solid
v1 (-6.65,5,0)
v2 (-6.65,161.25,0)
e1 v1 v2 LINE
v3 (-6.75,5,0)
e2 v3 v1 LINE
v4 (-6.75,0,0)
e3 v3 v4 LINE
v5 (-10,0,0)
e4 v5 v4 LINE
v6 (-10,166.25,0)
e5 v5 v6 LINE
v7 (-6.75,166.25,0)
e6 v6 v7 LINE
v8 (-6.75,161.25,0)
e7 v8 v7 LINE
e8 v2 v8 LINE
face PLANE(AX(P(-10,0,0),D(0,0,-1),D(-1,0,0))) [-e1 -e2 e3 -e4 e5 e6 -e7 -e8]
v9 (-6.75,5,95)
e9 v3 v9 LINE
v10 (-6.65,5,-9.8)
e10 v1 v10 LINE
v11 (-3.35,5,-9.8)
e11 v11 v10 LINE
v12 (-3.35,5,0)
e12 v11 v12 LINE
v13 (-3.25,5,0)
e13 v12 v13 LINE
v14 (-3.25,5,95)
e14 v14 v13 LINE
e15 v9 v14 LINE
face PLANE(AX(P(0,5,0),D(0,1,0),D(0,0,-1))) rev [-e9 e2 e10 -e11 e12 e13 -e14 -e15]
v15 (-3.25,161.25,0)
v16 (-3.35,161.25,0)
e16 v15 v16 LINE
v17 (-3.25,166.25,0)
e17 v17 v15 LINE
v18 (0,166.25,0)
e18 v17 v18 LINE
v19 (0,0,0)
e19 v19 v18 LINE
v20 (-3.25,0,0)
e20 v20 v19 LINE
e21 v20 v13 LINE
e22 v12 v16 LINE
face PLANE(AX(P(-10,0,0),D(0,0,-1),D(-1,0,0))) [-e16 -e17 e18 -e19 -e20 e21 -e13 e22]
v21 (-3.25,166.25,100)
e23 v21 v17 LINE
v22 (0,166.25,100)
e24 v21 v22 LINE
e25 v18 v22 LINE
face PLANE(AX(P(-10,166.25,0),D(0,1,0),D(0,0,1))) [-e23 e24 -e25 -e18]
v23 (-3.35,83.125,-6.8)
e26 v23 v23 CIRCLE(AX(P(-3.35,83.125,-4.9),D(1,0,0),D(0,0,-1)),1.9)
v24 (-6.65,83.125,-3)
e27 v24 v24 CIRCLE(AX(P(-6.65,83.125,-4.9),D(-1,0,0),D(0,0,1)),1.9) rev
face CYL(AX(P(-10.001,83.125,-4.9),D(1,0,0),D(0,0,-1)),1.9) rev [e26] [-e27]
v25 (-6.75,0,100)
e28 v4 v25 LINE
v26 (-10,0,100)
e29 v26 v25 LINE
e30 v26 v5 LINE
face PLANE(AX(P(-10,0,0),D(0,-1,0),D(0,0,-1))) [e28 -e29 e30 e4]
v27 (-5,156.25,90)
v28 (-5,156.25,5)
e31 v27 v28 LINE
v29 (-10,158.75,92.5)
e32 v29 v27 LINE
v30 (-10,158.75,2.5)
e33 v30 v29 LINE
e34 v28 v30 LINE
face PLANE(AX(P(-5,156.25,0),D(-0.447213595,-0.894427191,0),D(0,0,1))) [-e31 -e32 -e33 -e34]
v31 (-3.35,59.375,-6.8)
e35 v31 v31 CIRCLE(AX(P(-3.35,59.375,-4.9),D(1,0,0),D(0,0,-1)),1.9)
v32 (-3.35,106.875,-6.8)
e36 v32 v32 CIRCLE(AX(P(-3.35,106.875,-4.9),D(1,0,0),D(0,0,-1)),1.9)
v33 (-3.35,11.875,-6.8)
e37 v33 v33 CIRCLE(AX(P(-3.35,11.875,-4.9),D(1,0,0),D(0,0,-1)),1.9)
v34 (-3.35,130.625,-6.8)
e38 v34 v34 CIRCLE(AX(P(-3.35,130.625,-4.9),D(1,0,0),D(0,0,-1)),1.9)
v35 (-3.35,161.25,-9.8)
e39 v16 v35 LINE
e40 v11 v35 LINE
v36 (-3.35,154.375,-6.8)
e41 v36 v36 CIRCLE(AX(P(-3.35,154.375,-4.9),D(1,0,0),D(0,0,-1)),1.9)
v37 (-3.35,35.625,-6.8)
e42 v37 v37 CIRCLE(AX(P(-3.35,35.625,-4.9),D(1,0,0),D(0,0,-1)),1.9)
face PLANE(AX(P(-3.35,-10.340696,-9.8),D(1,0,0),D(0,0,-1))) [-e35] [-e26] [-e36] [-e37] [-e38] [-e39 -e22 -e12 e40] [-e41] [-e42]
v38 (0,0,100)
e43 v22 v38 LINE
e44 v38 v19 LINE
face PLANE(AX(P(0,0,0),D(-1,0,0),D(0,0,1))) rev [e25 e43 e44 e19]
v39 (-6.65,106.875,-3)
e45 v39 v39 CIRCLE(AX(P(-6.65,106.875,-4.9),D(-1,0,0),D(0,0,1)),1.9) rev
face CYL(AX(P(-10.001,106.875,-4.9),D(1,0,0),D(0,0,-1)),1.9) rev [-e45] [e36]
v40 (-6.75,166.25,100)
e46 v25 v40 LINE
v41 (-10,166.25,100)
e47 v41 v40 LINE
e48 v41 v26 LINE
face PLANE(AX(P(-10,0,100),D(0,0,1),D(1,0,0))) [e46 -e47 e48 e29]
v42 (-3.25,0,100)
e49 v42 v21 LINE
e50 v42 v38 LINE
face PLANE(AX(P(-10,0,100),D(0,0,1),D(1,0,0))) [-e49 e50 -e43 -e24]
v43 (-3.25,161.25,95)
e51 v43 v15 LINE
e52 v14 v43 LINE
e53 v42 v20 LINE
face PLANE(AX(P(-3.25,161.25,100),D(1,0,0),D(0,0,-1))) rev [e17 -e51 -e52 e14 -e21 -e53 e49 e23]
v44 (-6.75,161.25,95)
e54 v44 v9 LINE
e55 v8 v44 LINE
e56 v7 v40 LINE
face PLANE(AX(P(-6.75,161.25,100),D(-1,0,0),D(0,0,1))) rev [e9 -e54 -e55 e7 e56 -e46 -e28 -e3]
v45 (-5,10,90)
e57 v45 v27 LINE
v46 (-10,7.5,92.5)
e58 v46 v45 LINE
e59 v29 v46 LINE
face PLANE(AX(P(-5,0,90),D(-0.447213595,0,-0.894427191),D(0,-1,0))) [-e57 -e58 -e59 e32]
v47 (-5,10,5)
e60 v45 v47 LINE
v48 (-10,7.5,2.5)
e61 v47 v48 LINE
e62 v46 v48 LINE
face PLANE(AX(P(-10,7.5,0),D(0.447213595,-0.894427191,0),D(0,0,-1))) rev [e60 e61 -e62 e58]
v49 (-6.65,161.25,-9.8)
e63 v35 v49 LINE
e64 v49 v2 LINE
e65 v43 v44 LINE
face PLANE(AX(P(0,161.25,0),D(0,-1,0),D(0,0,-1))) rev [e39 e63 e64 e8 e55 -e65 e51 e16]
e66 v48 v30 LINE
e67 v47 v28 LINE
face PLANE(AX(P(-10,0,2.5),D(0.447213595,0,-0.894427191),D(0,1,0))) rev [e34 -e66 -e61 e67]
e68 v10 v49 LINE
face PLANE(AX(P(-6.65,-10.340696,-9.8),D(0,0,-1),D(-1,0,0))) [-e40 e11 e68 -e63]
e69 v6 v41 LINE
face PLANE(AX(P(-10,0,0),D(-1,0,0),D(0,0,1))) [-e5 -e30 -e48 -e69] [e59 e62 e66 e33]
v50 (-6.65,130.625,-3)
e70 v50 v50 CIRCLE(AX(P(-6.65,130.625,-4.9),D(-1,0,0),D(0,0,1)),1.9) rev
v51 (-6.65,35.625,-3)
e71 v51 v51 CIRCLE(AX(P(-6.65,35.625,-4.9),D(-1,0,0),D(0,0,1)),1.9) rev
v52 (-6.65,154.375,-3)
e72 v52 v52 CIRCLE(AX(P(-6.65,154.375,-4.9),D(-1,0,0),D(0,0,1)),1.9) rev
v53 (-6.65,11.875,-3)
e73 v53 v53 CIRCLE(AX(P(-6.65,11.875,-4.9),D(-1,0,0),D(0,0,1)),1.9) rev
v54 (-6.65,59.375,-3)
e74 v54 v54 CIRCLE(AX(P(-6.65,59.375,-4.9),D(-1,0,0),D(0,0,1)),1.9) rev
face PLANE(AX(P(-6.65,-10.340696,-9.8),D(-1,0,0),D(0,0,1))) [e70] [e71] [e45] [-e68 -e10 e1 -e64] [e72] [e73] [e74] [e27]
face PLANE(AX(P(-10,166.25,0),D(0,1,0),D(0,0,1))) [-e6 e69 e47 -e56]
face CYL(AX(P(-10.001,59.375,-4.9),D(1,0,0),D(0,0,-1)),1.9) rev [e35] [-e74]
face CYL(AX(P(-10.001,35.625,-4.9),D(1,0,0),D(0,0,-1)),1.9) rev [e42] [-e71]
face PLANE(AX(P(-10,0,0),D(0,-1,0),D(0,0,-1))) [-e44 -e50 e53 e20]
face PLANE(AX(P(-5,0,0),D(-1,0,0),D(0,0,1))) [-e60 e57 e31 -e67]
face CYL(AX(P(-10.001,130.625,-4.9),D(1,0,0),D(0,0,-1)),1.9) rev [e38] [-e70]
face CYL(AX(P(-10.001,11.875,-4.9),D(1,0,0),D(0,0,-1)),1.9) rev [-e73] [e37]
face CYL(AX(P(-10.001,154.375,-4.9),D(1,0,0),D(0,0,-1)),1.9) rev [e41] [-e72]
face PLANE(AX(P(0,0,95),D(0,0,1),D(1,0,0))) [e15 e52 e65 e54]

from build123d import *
from OCP.BRepFilletAPI import BRepFilletAPI_MakeChamfer

# Parameters (mm, degrees)
SKETCH1_W           = 166.25
SKETCH1_H           = 100
BOSS_EXTRUDE1_DEPTH = 10
SKETCH2_W           = 3.3
SKETCH2_H           = 9.8
BOSS_EXTRUDE2_DEPTH = 166.25
SKETCH3_W           = 3.5
SKETCH3_H           = 109.8
CUT_EXTRUDE1_DEPTH  = 5
CUT_EXTRUDE2_REACH  = 196.122
SKETCH4_R           = 1.9
LPATTERN1_COUNT     = 7
LPATTERN1_PITCH     = 23.75
SKETCH5_W           = 3.5
SKETCH5_H           = 156.25
CUT_EXTRUDE3_DEPTH  = 5
SKETCH6_W           = 146.25
SKETCH6_H           = 85
CUT_EXTRUDE4_DEPTH  = 5
CHAMFER1_SIZE       = 2.5
CHAMFER1_SIZE_2     = 5


with BuildPart() as part:
    # Sketch1 → Boss-Extrude1 (new body)
    with BuildSketch(Plane.YZ):
        with Locations((83.125, 50)):
            Rectangle(SKETCH1_W, SKETCH1_H)
    extrude(amount=-BOSS_EXTRUDE1_DEPTH)

    # Sketch2 → Boss-Extrude2 (add)
    with BuildSketch(Plane(origin=(0, 166.25, 0), x_dir=(-1, 0, 0), z_dir=(0, 1, 0))):
        with Locations((5, -4.9)):
            Rectangle(SKETCH2_W, SKETCH2_H)
    extrude(amount=-BOSS_EXTRUDE2_DEPTH)

    # Sketch3 → Cut-Extrude1 (cut)
    with BuildSketch(Plane(origin=(0, 166.25, 0), x_dir=(-1, 0, 0), z_dir=(0, 1, 0))):
        with Locations((5, 45.1)):
            Rectangle(SKETCH3_W, SKETCH3_H)
    cut_extrude1 = extrude(amount=-CUT_EXTRUDE1_DEPTH, mode=Mode.SUBTRACT)

    # Mirror1: Cut-Extrude1 across plane
    add(cut_extrude1.mirror(Plane.ZX.offset(83.125)), mode=Mode.SUBTRACT)

    # Sketch4 → Cut-Extrude2 (cut, up to next)
    with BuildSketch(Plane.YZ.offset(-3.35), mode=Mode.PRIVATE) as cut_extrude2_sk1:
        with Locations(Location((11.875, -4.9, 0), (0, 0, 270))):
            Circle(SKETCH4_R)
    cut_extrude2_tool1 = extrude(cut_extrude2_sk1.sketch, amount=-CUT_EXTRUDE2_REACH, mode=Mode.PRIVATE) & part.part
    cut_extrude2 = cut_extrude2_tool1.solids().sort_by_distance((-3.35, 11.875, -4.9))[0]
    add(cut_extrude2, mode=Mode.SUBTRACT)

    # LPattern1: Cut-Extrude2 ×7
    with Locations(*[(0, i * LPATTERN1_PITCH, 0) for i in range(1, LPATTERN1_COUNT)]):
        add(cut_extrude2, mode=Mode.SUBTRACT)

    # Sketch5 → Cut-Extrude3 (cut)
    with BuildSketch(Plane.XY.offset(100)):
        with Locations((-5, 83.125)):
            Rectangle(SKETCH5_W, SKETCH5_H)
    extrude(amount=-CUT_EXTRUDE3_DEPTH, mode=Mode.SUBTRACT)

    # Sketch6 → Cut-Extrude4 (cut)
    with BuildSketch(Plane.YZ.offset(-10)):
        with Locations((83.125, 47.5)):
            Rectangle(SKETCH6_W, SKETCH6_H)
    extrude(amount=CUT_EXTRUDE4_DEPTH, mode=Mode.SUBTRACT)

    # Chamfer1
    chamfer1_edges_1 = [part.edges().sort_by_distance(p)[0] for p in [
        (-10, 10, 47.5),
    ]]
    chamfer1_side_1 = [part.faces().sort_by_distance(p)[0] for p in [
        (-10, 9.95, 47.5),
    ]]
    chamfer1_edges_2 = [part.edges().sort_by_distance(p)[0] for p in [
        (-10, 83.125, 5),
    ]]
    chamfer1_side_2 = [part.faces().sort_by_distance(p)[0] for p in [
        (-10, 83.125, 4.95),
    ]]
    chamfer1_edges_3 = [part.edges().sort_by_distance(p)[0] for p in [
        (-10, 156.25, 47.5),
    ]]
    chamfer1_side_3 = [part.faces().sort_by_distance(p)[0] for p in [
        (-10, 156.3, 47.5),
    ]]
    chamfer1_edges_4 = [part.edges().sort_by_distance(p)[0] for p in [
        (-10, 83.125, 90),
    ]]
    chamfer1_side_4 = [part.faces().sort_by_distance(p)[0] for p in [
        (-10, 83.125, 90.05),
    ]]
    chamfer1 = BRepFilletAPI_MakeChamfer(part.part.solid().wrapped)
    for e in chamfer1_edges_1:
        chamfer1.Add(CHAMFER1_SIZE - 0.0001, CHAMFER1_SIZE_2 - 0.0001, e.wrapped, chamfer1_side_1[0].wrapped)
    for e in chamfer1_edges_2:
        chamfer1.Add(CHAMFER1_SIZE - 0.0001, CHAMFER1_SIZE_2 - 0.0001, e.wrapped, chamfer1_side_2[0].wrapped)
    for e in chamfer1_edges_3:
        chamfer1.Add(CHAMFER1_SIZE - 0.0001, CHAMFER1_SIZE_2 - 0.0001, e.wrapped, chamfer1_side_3[0].wrapped)
    for e in chamfer1_edges_4:
        chamfer1.Add(CHAMFER1_SIZE - 0.0001, CHAMFER1_SIZE_2 - 0.0001, e.wrapped, chamfer1_side_4[0].wrapped)
    add(Compound.cast(chamfer1.Shape()), mode=Mode.REPLACE)  # a hair under: the kernel refuses the full size


solid = part.part
